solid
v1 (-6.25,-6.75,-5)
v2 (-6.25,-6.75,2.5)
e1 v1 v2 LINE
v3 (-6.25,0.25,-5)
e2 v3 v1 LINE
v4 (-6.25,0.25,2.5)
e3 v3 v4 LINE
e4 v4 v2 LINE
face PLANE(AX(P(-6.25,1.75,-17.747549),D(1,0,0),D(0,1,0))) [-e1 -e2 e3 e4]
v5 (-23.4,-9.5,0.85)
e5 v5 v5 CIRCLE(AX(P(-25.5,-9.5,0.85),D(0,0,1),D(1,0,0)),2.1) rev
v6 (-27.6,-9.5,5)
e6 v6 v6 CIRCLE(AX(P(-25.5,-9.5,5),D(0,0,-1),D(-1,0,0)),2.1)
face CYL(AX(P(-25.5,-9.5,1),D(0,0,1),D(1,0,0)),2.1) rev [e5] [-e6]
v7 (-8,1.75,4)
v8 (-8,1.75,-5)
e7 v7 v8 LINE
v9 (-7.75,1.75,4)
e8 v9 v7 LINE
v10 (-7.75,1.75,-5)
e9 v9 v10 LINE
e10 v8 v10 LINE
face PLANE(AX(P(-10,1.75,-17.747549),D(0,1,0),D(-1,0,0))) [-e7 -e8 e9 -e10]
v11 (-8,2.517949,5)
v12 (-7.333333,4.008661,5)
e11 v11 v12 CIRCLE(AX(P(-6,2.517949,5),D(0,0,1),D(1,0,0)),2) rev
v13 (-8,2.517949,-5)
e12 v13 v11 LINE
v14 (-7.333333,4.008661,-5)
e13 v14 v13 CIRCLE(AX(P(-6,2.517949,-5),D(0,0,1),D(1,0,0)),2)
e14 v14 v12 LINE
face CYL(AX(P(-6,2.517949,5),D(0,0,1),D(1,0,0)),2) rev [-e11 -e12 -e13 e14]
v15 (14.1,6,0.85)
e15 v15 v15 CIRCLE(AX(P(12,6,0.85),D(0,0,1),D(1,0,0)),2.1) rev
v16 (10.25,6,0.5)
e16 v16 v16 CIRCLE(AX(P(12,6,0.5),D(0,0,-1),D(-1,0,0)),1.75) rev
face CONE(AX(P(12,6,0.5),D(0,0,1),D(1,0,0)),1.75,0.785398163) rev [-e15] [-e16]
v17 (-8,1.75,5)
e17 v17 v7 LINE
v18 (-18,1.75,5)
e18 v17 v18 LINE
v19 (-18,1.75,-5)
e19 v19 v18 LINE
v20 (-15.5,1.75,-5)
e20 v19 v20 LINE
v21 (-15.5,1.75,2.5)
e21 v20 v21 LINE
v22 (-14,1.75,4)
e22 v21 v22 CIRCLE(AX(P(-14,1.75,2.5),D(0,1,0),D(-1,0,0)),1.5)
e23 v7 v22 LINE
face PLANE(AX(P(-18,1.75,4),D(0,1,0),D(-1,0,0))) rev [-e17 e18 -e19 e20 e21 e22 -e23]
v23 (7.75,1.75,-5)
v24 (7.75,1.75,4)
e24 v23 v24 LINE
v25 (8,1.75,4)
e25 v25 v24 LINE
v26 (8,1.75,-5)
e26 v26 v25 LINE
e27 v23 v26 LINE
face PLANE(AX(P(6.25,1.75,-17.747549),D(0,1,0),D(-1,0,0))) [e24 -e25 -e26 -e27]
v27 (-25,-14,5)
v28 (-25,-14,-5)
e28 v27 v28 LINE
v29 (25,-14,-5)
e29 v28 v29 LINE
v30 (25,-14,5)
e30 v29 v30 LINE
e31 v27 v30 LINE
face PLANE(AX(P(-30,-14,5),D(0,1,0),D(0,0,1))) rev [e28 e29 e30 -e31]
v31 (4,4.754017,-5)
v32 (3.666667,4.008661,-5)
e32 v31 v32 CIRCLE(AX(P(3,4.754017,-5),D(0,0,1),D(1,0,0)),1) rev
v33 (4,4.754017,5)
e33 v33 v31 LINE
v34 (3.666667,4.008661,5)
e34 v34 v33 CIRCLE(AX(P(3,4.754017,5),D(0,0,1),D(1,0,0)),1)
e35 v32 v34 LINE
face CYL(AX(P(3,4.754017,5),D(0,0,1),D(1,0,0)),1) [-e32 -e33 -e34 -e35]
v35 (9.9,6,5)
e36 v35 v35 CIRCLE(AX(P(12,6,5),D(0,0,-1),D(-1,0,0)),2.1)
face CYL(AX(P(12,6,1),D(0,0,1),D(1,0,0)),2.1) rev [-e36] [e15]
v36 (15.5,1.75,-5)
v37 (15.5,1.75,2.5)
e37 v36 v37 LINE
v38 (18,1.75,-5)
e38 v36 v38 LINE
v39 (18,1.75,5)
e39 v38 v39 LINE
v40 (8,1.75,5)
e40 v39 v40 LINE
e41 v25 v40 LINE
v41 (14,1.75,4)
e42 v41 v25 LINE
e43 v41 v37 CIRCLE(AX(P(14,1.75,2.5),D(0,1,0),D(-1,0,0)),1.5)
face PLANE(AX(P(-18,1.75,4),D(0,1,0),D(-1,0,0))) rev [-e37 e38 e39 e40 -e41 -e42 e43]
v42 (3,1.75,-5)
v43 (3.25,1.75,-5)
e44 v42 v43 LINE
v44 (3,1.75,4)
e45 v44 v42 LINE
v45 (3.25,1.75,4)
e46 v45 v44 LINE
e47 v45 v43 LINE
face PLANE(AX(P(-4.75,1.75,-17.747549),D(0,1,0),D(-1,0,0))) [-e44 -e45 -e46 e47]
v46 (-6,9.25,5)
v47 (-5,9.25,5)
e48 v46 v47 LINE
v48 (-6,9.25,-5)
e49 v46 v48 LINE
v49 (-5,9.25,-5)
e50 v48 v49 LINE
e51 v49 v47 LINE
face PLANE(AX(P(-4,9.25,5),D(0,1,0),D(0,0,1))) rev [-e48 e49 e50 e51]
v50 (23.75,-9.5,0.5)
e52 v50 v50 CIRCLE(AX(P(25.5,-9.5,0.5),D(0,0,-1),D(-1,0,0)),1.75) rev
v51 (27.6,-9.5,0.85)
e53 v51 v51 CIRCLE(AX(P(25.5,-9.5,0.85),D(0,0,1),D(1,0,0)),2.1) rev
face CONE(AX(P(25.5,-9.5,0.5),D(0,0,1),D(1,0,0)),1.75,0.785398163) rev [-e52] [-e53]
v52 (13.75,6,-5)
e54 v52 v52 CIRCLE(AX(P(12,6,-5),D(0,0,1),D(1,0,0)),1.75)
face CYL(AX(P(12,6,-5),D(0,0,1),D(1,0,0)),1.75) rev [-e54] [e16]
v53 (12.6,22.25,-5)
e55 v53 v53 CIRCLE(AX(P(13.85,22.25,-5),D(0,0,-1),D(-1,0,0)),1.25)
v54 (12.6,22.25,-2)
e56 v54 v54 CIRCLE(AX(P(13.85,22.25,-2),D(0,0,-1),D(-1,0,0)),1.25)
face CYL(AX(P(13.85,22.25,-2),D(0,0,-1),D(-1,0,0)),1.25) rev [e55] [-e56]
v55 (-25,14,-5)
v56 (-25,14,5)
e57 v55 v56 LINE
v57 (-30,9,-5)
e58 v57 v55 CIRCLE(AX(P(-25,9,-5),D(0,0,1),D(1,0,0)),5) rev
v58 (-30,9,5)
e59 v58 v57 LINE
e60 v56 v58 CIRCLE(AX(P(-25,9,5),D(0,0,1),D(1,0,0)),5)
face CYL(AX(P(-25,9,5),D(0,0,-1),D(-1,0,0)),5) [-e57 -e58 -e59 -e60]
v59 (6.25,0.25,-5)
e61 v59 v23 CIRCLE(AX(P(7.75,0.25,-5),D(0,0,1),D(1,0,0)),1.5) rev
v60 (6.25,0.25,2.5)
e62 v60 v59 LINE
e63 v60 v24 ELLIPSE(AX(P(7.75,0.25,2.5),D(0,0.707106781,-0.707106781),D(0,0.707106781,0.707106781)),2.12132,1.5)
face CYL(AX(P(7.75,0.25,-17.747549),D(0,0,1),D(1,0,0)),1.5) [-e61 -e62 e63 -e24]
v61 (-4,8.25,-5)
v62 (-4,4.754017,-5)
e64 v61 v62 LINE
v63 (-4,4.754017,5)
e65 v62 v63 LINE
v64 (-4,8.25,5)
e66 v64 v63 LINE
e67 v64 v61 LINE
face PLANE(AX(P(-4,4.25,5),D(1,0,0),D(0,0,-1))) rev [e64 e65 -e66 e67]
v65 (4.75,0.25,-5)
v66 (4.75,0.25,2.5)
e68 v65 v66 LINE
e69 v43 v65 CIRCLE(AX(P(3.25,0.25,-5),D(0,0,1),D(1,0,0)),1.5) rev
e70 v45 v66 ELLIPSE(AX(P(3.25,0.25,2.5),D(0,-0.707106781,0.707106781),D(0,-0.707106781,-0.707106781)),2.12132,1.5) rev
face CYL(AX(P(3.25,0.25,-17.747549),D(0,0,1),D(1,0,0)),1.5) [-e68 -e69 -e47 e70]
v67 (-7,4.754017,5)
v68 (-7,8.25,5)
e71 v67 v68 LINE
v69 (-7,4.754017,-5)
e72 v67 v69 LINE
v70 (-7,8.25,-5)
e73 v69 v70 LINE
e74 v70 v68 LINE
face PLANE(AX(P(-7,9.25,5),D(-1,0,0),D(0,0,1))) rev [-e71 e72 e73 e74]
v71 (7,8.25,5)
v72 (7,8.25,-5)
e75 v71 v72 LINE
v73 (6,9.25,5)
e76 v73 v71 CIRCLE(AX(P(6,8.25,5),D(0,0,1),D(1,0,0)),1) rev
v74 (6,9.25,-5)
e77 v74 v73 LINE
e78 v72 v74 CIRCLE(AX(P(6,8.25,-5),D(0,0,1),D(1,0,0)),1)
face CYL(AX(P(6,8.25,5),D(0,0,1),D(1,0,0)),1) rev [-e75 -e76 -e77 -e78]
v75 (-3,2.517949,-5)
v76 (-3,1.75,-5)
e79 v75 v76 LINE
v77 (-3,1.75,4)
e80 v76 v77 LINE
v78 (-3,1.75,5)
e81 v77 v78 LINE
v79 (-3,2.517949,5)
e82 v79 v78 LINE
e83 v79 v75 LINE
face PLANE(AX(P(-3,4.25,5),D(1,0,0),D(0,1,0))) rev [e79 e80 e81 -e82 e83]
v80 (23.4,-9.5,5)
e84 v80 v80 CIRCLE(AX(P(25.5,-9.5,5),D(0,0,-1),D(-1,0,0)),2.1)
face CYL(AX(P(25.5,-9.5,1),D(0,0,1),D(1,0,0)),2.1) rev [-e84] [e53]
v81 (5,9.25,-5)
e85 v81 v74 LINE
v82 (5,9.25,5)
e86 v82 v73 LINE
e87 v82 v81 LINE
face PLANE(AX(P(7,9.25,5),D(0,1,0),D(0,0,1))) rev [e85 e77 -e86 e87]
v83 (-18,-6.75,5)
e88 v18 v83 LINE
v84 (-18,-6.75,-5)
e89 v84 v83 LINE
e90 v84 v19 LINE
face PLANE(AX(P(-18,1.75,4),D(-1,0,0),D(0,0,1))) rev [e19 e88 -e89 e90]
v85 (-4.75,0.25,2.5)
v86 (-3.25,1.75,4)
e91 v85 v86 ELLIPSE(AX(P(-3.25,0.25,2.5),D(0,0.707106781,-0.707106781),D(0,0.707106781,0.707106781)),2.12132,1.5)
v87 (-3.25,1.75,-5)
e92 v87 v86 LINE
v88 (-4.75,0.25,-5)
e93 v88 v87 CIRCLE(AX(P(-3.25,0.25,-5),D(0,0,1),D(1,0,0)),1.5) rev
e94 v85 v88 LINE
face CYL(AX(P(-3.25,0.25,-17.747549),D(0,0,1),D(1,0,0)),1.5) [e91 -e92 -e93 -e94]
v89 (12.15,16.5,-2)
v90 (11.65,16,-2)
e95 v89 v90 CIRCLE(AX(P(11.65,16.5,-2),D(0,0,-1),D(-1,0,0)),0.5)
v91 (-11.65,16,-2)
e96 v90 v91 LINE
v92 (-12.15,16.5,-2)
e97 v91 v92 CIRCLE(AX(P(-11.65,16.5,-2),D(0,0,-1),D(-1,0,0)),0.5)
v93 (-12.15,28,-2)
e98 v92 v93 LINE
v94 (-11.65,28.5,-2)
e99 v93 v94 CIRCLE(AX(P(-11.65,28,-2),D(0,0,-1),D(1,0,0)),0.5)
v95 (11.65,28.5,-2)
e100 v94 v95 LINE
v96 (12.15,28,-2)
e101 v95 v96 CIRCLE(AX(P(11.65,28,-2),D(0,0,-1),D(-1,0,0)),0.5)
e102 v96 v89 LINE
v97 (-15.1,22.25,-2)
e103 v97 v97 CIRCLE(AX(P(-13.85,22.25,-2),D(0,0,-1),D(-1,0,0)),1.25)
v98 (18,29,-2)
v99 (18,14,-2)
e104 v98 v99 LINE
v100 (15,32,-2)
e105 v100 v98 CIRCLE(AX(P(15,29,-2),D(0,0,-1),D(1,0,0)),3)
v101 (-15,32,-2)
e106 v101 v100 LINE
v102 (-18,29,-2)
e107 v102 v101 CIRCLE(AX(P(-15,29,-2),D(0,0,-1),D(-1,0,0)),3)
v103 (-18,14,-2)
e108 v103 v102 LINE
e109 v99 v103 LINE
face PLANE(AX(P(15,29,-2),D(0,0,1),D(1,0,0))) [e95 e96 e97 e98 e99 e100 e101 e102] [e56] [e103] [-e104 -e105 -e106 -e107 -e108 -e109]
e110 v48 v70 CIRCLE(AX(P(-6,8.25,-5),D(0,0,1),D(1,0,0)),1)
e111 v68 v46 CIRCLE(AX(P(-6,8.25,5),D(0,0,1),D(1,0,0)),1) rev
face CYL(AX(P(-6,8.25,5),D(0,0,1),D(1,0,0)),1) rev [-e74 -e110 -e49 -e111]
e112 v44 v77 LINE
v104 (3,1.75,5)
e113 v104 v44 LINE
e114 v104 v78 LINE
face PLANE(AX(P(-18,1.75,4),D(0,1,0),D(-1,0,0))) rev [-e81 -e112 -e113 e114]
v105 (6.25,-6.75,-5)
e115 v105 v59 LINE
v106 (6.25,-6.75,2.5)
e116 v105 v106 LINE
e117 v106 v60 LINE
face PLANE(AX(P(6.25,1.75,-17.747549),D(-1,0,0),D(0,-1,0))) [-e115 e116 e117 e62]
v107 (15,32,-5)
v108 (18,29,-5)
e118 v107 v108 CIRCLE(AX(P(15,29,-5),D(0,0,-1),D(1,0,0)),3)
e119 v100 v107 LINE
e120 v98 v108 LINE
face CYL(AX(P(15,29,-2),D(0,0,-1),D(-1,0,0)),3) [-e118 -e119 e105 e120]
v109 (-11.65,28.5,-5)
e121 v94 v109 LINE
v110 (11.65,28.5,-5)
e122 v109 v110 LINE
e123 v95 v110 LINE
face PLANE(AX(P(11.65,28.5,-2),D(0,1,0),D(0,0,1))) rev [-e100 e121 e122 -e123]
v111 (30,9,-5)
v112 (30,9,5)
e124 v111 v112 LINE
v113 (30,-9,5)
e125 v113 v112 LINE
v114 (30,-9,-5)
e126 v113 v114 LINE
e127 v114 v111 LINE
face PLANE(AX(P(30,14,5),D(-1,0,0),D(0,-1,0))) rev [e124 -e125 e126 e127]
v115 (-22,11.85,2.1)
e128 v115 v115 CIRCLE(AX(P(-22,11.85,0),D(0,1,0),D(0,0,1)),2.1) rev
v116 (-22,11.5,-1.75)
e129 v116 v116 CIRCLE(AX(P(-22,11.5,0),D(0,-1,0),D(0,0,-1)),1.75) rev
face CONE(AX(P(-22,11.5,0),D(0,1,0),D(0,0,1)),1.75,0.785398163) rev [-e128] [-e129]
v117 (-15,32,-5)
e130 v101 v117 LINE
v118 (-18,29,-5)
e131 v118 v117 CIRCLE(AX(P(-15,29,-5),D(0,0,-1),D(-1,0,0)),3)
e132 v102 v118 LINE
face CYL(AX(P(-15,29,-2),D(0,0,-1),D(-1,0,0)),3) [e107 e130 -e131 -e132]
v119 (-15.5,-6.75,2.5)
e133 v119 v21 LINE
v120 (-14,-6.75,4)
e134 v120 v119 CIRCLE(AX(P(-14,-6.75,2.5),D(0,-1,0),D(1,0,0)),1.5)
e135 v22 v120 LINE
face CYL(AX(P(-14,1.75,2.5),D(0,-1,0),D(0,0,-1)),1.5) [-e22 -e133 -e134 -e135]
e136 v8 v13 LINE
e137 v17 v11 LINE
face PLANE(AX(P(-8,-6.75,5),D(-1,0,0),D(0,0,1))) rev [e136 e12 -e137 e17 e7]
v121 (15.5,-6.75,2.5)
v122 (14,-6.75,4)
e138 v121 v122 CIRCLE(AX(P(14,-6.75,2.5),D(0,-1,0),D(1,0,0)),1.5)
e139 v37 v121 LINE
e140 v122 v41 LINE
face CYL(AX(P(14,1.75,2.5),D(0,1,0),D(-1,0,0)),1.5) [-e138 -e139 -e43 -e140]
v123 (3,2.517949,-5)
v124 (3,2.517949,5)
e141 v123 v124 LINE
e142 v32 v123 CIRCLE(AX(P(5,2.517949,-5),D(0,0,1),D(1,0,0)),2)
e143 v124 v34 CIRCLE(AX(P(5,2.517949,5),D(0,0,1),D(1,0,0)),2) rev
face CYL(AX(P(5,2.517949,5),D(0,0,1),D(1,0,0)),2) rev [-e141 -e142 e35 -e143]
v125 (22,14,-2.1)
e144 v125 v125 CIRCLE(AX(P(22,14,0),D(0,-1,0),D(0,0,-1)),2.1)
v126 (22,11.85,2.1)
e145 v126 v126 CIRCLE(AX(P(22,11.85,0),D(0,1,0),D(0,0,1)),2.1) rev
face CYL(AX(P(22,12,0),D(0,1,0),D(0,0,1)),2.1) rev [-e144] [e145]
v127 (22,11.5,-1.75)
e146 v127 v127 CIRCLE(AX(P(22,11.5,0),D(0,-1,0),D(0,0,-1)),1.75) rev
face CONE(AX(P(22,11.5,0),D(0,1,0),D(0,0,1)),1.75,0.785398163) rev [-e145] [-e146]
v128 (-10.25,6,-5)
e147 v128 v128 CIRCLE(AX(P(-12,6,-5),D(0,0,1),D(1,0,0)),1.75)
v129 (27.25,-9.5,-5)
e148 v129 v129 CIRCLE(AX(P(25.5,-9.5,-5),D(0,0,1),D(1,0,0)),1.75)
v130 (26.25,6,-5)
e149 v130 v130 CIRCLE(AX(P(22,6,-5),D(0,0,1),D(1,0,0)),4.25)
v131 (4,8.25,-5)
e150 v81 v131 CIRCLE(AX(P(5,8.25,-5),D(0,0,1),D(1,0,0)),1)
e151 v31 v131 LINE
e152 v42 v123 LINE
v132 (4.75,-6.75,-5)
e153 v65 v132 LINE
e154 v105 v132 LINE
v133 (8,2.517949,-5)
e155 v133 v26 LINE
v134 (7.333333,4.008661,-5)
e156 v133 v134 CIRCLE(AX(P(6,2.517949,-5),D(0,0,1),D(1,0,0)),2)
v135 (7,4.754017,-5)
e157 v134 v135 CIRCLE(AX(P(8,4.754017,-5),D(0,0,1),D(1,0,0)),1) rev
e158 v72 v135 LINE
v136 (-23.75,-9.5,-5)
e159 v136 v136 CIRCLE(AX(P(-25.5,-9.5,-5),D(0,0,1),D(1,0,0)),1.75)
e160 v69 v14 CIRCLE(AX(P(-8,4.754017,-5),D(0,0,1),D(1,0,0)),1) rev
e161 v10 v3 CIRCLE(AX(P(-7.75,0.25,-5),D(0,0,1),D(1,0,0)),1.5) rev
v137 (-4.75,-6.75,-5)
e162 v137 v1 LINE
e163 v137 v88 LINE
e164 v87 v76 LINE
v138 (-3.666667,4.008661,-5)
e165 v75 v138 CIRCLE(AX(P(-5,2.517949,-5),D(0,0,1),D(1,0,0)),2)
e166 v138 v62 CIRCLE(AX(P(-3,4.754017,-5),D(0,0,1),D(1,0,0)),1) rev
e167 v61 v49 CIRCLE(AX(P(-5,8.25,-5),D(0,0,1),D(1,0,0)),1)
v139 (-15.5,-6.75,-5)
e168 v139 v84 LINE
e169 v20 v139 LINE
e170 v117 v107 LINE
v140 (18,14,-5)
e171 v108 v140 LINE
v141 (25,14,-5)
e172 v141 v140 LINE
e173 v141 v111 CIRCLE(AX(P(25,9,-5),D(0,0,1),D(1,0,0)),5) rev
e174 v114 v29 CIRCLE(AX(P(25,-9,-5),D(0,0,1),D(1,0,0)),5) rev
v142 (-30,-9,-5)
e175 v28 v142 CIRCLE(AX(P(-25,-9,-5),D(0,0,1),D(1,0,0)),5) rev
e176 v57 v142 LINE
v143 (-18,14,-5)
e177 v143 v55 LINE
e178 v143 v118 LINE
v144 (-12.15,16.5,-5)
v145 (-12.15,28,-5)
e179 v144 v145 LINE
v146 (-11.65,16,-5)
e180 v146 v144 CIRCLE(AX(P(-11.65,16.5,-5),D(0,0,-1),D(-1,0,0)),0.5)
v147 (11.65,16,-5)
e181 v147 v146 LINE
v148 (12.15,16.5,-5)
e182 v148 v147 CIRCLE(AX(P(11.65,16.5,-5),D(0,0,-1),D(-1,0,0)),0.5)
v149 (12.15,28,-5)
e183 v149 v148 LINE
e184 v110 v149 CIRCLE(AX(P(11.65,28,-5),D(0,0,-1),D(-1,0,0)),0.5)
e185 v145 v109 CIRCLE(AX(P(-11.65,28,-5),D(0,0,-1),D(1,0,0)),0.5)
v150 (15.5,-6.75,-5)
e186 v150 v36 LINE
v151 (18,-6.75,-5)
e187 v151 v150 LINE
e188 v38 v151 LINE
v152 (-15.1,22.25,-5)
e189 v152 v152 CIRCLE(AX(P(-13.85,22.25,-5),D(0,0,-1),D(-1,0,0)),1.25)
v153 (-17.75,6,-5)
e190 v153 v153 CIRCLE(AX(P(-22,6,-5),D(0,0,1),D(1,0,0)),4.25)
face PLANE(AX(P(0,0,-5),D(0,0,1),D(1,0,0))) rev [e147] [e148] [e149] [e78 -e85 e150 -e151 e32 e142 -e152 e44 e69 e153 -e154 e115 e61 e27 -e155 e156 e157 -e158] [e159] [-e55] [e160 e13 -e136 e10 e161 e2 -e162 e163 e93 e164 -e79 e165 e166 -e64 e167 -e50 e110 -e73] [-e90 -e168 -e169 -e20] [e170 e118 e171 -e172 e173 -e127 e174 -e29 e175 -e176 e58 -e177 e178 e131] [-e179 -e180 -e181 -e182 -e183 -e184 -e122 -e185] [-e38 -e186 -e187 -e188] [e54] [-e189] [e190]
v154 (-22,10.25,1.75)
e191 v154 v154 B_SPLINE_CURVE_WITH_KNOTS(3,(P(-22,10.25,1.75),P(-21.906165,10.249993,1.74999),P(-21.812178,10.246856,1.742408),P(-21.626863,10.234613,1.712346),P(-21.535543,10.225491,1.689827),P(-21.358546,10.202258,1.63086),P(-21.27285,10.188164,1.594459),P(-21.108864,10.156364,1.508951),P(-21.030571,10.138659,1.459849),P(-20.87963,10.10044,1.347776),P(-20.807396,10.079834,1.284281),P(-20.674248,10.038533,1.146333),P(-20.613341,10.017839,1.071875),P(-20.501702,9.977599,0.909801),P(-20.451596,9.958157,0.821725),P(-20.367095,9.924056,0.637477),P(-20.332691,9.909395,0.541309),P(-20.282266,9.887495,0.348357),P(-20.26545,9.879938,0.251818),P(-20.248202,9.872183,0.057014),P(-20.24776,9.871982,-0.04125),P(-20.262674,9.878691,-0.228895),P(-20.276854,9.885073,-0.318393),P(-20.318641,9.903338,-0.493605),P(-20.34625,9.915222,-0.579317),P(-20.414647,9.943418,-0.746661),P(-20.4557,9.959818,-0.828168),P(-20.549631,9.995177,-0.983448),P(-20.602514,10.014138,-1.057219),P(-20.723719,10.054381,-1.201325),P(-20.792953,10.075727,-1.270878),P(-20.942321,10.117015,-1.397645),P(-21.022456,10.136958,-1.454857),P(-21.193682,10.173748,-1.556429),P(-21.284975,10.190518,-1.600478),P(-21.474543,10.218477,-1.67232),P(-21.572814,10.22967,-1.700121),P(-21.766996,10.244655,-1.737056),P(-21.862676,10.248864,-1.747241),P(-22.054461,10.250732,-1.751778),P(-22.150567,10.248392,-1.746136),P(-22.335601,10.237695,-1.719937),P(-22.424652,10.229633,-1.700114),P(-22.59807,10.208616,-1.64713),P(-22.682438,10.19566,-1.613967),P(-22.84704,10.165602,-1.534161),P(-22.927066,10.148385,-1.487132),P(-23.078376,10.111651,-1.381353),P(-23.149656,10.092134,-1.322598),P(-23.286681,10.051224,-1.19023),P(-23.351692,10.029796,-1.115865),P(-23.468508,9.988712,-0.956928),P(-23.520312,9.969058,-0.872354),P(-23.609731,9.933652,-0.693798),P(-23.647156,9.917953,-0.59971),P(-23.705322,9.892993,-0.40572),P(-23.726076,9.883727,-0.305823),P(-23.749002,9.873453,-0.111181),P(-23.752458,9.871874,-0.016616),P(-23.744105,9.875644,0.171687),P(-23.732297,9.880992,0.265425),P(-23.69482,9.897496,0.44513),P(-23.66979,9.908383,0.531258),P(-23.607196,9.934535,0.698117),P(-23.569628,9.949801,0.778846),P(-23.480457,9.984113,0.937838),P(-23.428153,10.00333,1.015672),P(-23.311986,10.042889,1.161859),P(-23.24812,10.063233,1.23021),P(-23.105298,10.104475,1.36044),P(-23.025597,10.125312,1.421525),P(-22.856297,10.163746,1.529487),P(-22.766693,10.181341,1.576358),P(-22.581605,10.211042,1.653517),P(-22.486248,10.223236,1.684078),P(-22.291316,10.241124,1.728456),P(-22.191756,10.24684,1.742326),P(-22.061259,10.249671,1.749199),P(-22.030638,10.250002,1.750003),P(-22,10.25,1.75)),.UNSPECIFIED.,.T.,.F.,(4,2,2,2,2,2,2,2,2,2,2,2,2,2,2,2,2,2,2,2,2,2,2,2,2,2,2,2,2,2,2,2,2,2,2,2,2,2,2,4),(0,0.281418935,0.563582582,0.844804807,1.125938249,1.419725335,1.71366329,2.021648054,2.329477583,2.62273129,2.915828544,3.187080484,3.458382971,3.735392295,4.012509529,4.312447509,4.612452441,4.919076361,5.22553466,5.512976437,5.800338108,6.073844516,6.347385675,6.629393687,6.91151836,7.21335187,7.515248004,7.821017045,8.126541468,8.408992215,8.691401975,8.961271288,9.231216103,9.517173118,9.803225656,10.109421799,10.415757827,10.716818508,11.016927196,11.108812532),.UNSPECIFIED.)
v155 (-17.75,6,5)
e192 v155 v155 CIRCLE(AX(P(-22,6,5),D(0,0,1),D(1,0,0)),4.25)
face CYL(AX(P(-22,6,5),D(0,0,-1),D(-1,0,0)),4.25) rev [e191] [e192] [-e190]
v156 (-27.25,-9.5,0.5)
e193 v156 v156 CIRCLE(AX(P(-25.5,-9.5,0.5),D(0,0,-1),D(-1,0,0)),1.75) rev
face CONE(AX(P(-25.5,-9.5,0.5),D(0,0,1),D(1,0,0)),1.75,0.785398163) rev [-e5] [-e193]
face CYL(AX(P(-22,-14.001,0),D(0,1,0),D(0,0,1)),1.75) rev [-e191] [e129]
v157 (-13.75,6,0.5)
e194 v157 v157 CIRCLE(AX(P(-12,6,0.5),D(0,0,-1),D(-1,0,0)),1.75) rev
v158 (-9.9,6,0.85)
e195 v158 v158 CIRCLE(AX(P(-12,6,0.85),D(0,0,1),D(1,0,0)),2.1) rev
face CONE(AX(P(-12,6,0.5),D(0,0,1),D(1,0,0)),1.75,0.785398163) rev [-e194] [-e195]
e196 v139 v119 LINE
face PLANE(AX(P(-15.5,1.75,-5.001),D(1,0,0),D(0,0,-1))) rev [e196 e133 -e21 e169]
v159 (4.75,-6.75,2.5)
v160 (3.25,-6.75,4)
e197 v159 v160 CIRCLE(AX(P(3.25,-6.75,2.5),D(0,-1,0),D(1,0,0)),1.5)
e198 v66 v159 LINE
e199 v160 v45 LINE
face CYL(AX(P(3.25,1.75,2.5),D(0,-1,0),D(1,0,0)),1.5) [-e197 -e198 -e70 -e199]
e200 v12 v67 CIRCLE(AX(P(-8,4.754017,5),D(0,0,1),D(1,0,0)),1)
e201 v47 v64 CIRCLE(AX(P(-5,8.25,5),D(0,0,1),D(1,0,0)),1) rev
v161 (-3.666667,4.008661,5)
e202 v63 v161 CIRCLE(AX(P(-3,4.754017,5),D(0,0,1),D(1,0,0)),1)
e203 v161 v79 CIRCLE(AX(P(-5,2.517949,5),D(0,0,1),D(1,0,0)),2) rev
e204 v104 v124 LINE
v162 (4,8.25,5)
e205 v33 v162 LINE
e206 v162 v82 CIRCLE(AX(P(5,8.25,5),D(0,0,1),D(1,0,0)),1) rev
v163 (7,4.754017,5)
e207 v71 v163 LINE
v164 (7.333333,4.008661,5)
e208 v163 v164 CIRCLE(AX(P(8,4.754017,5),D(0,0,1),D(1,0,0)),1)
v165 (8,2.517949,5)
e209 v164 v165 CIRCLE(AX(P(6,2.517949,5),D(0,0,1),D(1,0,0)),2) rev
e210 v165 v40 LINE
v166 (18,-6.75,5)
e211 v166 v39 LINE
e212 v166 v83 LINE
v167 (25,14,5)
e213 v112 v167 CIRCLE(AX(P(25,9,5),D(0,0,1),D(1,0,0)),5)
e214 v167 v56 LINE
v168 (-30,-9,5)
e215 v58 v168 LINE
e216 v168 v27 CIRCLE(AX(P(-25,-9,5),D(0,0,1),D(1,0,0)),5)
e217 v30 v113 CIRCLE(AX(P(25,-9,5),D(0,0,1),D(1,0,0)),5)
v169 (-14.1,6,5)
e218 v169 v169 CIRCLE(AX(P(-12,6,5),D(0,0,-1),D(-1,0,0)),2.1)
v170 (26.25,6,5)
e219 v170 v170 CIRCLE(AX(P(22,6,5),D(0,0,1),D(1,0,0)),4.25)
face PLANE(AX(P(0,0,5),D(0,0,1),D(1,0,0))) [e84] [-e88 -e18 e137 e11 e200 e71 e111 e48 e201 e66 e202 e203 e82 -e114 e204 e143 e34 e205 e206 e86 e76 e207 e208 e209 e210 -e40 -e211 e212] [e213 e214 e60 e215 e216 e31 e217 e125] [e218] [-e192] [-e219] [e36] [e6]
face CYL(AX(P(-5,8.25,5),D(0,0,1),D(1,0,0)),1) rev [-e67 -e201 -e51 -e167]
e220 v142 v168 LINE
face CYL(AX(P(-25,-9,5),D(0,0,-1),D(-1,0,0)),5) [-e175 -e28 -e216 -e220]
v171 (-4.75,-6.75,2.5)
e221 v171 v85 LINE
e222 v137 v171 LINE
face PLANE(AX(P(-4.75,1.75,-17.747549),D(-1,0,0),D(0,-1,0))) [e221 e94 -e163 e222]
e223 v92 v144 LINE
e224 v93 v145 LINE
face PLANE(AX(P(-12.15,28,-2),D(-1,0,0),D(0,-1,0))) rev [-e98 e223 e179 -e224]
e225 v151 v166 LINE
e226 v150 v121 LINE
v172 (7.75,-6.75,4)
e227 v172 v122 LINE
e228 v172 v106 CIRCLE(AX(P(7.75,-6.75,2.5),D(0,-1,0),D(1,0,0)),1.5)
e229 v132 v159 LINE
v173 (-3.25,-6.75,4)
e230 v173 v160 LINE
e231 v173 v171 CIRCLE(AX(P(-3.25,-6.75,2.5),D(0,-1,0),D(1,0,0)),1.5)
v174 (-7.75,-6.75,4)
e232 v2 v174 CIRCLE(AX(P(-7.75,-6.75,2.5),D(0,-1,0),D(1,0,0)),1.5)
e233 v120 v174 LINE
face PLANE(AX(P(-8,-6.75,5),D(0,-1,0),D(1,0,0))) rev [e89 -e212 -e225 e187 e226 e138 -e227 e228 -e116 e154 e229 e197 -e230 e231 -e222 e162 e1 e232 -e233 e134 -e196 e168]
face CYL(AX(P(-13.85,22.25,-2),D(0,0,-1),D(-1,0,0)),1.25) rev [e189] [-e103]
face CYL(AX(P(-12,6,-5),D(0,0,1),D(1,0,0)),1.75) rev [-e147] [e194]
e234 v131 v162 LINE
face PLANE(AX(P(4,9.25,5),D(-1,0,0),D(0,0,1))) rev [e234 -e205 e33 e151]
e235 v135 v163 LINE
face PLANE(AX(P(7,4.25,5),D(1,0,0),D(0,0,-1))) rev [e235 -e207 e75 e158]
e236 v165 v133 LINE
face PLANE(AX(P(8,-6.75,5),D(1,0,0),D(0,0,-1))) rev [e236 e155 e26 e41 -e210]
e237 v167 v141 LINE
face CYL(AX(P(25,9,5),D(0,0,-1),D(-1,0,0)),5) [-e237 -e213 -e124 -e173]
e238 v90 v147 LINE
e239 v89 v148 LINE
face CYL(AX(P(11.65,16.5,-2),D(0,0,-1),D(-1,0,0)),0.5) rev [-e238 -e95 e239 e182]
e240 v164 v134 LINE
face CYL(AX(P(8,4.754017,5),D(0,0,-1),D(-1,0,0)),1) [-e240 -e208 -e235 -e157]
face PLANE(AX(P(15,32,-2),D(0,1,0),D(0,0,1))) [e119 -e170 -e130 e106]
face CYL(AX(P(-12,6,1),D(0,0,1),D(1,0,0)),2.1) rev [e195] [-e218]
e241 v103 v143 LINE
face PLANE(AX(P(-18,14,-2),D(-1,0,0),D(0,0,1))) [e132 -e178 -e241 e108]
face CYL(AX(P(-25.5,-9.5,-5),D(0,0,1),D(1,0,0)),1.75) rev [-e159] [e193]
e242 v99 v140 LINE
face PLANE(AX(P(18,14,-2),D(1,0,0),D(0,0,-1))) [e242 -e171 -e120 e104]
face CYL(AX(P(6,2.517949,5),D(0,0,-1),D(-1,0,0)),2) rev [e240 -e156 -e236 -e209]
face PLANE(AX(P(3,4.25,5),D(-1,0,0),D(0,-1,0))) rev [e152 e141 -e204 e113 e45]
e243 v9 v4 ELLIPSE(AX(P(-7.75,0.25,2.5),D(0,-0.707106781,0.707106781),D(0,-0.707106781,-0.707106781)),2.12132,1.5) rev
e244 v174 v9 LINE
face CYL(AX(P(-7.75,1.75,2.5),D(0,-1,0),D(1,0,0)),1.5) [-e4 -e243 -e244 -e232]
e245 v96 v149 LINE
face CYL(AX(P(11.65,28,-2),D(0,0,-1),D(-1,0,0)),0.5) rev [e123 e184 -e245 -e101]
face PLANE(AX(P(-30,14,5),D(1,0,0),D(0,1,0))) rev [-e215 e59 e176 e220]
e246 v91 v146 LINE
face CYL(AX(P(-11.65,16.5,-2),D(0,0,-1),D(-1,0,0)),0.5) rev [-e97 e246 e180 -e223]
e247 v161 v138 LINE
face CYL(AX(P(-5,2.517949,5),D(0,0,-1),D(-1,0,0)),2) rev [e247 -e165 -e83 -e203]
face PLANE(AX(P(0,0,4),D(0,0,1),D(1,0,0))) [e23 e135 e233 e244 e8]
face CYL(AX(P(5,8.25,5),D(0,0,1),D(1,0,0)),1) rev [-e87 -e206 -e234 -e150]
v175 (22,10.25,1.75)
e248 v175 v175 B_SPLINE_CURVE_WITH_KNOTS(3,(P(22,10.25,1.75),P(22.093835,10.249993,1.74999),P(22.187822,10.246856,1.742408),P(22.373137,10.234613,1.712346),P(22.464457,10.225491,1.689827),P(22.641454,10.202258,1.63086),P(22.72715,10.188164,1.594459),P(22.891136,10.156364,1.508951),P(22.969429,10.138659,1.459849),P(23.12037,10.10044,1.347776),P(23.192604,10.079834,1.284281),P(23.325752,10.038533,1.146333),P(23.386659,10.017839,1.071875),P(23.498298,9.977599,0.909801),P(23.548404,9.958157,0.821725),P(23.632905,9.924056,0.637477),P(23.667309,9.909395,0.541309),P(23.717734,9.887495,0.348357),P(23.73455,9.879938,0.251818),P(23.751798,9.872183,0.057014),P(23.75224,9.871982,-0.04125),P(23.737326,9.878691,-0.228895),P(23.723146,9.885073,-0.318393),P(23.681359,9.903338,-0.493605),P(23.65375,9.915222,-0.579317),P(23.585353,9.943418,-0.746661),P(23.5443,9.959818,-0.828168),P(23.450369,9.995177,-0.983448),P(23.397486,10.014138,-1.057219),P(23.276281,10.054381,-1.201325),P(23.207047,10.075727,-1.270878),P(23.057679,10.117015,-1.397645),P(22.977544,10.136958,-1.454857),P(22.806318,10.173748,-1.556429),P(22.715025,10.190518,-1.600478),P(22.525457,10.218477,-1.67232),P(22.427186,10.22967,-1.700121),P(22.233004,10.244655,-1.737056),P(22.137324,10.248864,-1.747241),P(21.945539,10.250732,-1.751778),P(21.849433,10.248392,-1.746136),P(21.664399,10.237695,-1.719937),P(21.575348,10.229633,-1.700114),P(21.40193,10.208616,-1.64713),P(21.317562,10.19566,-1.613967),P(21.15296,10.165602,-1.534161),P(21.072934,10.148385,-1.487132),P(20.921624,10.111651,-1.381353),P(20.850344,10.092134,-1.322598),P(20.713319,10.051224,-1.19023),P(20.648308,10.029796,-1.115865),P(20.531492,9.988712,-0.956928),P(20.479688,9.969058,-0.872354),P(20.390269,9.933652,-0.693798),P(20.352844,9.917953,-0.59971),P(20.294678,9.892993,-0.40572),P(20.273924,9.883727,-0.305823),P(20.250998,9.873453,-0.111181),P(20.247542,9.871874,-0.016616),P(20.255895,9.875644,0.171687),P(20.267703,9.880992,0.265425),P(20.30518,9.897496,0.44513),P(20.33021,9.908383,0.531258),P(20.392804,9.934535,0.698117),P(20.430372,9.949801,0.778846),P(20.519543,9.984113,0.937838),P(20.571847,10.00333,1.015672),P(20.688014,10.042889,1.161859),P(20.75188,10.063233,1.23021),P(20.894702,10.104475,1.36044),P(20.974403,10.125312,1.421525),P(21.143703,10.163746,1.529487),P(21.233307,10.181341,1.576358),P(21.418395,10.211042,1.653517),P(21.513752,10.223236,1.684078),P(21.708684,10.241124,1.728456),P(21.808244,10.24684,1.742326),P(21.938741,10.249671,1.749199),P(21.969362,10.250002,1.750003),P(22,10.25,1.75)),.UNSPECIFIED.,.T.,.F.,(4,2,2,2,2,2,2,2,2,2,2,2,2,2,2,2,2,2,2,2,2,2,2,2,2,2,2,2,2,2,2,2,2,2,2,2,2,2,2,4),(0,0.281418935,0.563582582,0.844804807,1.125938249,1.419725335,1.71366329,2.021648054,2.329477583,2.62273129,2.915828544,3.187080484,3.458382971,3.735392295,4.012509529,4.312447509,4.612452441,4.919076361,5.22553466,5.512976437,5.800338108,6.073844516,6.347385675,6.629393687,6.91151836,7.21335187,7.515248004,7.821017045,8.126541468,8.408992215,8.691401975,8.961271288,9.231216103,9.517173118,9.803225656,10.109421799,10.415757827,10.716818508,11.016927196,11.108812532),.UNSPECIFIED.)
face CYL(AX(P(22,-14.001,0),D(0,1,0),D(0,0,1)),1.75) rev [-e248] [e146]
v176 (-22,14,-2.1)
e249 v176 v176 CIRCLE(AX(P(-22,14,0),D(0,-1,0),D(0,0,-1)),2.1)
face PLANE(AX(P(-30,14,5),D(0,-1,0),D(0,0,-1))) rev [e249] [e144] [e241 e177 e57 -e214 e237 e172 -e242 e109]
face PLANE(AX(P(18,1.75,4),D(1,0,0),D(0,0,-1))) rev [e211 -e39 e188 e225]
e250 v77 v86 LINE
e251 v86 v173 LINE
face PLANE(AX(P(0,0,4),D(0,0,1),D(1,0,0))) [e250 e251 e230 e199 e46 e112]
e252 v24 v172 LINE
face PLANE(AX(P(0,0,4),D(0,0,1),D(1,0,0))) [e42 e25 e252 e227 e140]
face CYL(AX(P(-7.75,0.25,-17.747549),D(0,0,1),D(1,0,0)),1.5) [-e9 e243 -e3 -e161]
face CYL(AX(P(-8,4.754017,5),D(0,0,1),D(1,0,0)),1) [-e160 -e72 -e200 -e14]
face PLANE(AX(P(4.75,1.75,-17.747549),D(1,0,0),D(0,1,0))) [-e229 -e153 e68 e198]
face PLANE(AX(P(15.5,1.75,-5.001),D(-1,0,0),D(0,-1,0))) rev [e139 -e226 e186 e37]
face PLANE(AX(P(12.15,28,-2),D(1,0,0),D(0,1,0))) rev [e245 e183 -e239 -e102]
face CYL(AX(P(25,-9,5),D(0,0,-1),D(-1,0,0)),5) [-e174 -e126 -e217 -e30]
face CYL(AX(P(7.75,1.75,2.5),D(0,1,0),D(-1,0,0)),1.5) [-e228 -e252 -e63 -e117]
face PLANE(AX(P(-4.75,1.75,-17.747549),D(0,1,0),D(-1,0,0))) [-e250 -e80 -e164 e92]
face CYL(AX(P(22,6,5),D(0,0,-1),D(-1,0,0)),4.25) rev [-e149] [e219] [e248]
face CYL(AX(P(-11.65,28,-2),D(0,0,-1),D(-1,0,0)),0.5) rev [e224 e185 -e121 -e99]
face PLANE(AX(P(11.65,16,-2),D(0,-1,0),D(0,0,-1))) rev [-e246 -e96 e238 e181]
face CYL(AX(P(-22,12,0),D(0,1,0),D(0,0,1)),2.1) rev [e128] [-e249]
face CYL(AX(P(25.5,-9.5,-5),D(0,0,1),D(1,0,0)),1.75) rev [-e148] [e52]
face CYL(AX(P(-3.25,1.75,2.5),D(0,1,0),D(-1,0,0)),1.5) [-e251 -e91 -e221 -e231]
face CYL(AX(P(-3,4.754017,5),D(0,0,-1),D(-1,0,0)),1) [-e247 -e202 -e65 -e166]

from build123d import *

# Parameters (mm, degrees)
SKETCH1_W           = 60
SKETCH1_H           = 28
SKETCH1_R           = 4.25
BOSS_EXTRUDE1_DEPTH = 5
CUT_EXTRUDE1_DEPTH  = 35.583232932
CUT_EXTRUDE2_REACH  = 43.34
SKETCH3_R           = 1.75
FILLET1_R           = 5
FILLET2_R           = 2
SKETCH4_R           = 1.25
BOSS_EXTRUDE2_DEPTH = 3
SKETCH5_W           = 3.75
SKETCH5_H           = 8.5
SKETCH5_W_2         = 9.5
BOSS_EXTRUDE4_DEPTH = 10
SKETCH6_W           = 36
SKETCH6_H           = 8.5
CUT_EXTRUDE3_DEPTH  = 1
SKETCH7_R           = 1.75
CUT_EXTRUDE4_DEPTH  = 45.988887539
SKETCH8_R           = 2.1
CUT_EXTRUDE5_DEPTH  = 4
SKETCH9_R           = 2.1
CUT_EXTRUDE6_DEPTH  = 2
CHAMFER1_SIZE       = 0.5
CUT_EXTRUDE7_REACH  = 46.777
SKETCH10_W          = 2.5
SKETCH10_H          = 8.5
FILLET3_R           = 1.5
FILLET4_R           = 1


with BuildPart() as part:
    # Sketch1 → Boss-Extrude1 (new, symmetric)
    with BuildSketch(Plane.XY):
        Rectangle(SKETCH1_W, SKETCH1_H)
        with Locations((-22, 6)):
            Circle(SKETCH1_R, mode=Mode.SUBTRACT)
        with Locations((22, 6)):
            Circle(SKETCH1_R, mode=Mode.SUBTRACT)
    extrude(amount=BOSS_EXTRUDE1_DEPTH, both=True)

    # Sketch2 → Cut-Extrude1 (cut, through all)
    with BuildSketch(Plane(origin=(0, 0, -5), x_dir=(-1, 0, 0), z_dir=(0, 0, -1))):
        Polygon((8, -6.75), (3, -6.75), (3, 4.25), (4, 4.25), (4, 9.25), (7, 9.25), (7, 4.25), (8, 4.25), align=None)
        Polygon((-8, -6.75), (-8, 4.25), (-7, 4.25), (-7, 9.25), (-4, 9.25), (-4, 4.25), (-3, 4.25), (-3, -6.75), align=None)
    extrude(amount=-CUT_EXTRUDE1_DEPTH, mode=Mode.SUBTRACT)

    # Sketch3 → Cut-Extrude2 (cut, up to next)
    with BuildSketch(Plane(origin=(0, 14, 0), x_dir=(1, 0, 0), z_dir=(0, 1, 0)), mode=Mode.PRIVATE) as cut_extrude2_sk1:
        with Locations(Location((-22, 0, 0), (0, 0, 270))):
            Circle(SKETCH3_R)
    cut_extrude2_tool1 = extrude(cut_extrude2_sk1.sketch, amount=-CUT_EXTRUDE2_REACH, mode=Mode.PRIVATE) & part.part
    # Sketch3 → Cut-Extrude2 (cut, up to next)
    with BuildSketch(Plane(origin=(0, 14, 0), x_dir=(1, 0, 0), z_dir=(0, 1, 0)), mode=Mode.PRIVATE) as cut_extrude2_sk2:
        with Locations(Location((22, 0, 0), (0, 0, 270))):
            Circle(SKETCH3_R)
    cut_extrude2_tool2 = extrude(cut_extrude2_sk2.sketch, amount=-CUT_EXTRUDE2_REACH, mode=Mode.PRIVATE) & part.part
    add(cut_extrude2_tool1.solids().sort_by_distance((-22, 14, 0))[0], mode=Mode.SUBTRACT)
    add(cut_extrude2_tool2.solids().sort_by_distance((22, 14, 0))[0], mode=Mode.SUBTRACT)

    # Fillet1
    fillet1_edges = [part.edges().sort_by_distance(p)[0] for p in [
        (-30, 14, 0),
        (30, 14, 0),
        (30, -14, 0),
        (-30, -14, 0),
    ]]
    fillet(fillet1_edges, radius=FILLET1_R)

    # Fillet2
    # the kernel refuses this fillet: 2 mm, written as the material it adds along each edge
    with BuildSketch(Plane(origin=(-8, 4.25, -5), x_dir=(0, -1, 0), z_dir=(0, 0, 1)), Plane(origin=(3, 4.25, -5), x_dir=(0, -1, 0), z_dir=(0, 0, 1))) as fillet2_piece_1:
        with BuildLine():
            CenterArc((1.732050808, 2), FILLET2_R, 210, 60)
            Line((0, 1), (-0.034641016, 0.98))
            ThreePointArc((-0.034641016, 0.98), (-0.04, 0.5), (-0.04, 0))
            Line((-0.04, 0), (0, -0.04))
            Line((0, -0.04), (1.732050808, -0.04))
            Line((1.732050808, -0.04), (1.732050808, 0))
        make_face()
    extrude(amount=10)
    with BuildSketch(Plane(origin=(-3, 4.25, -5), x_dir=(-1, 0, 0), z_dir=(0, 0, 1)), Plane(origin=(8, 4.25, -5), x_dir=(-1, 0, 0), z_dir=(0, 0, 1))) as fillet2_piece_2:
        with BuildLine():
            CenterArc((2, 1.732050808), FILLET2_R, 180, 60)
            Line((0, 1.732050808), (-0.04, 1.732050808))
            Line((-0.04, 1.732050808), (-0.04, 0))
            Line((-0.04, 0), (0, -0.04))
            ThreePointArc((0, -0.04), (0.5, -0.04), (0.98, -0.034641016))
            Line((0.98, -0.034641016), (1, 0))
        make_face()
    extrude(amount=10)

    # Sketch4 → Boss-Extrude2 (add)
    with BuildSketch(Plane(origin=(0, 0, -5), x_dir=(-1, 0, 0), z_dir=(0, 0, -1))):
        with BuildLine():
            Line((-18, 14), (18, 14))
            Line((18, 14), (18, 29))
            ThreePointArc((18, 29), (17.121320344, 31.121320344), (15, 32))
            Line((15, 32), (-15, 32))
            ThreePointArc((-15, 32), (-17.121320344, 31.121320344), (-18, 29))
            Line((-18, 29), (-18, 14))
        make_face()
        with Locations((-13.85, 22.25)):
            Circle(SKETCH4_R, mode=Mode.SUBTRACT)
        with Locations((13.85, 22.25)):
            Circle(SKETCH4_R, mode=Mode.SUBTRACT)
        with BuildLine():
            Line((-11.65, 28.5), (11.65, 28.5))
            ThreePointArc((11.65, 28.5), (12.003553391, 28.353553391), (12.15, 28))
            Line((12.15, 28), (12.15, 16.5))
            ThreePointArc((12.15, 16.5), (12.003553391, 16.146446609), (11.65, 16))
            Line((11.65, 16), (-11.65, 16))
            ThreePointArc((-11.65, 16), (-12.003553391, 16.146446609), (-12.15, 16.5))
            Line((-12.15, 16.5), (-12.15, 28))
            ThreePointArc((-12.15, 28), (-12.003553391, 28.353553391), (-11.65, 28.5))
        make_face(mode=Mode.SUBTRACT)
    extrude(amount=-BOSS_EXTRUDE2_DEPTH)

    # Sketch5 → Boss-Extrude4 (add)
    with BuildSketch(Plane.XY.offset(5)):
        with Locations((-8.125, -2.5)):
            Rectangle(SKETCH5_W, SKETCH5_H)
        with Locations((0, -2.5)):
            Rectangle(SKETCH5_W_2, SKETCH5_H)
        with Locations((8.125, -2.5)):
            Rectangle(SKETCH5_W, SKETCH5_H)
    extrude(amount=-BOSS_EXTRUDE4_DEPTH)

    # Sketch6 → Cut-Extrude3 (cut)
    with BuildSketch(Plane.XY.offset(5)):
        with Locations((0, -2.5)):
            Rectangle(SKETCH6_W, SKETCH6_H)
    extrude(amount=-CUT_EXTRUDE3_DEPTH, mode=Mode.SUBTRACT)

    # Sketch7 → Cut-Extrude4 (cut, through all)
    with BuildSketch(Plane.XY.offset(5)):
        with Locations((25.5, -9.5)):
            Circle(SKETCH7_R)
        with Locations((-25.5, -9.5)):
            Circle(SKETCH7_R)
        with Locations((-12, 6)):
            Circle(SKETCH7_R)
        with Locations((12, 6)):
            Circle(SKETCH7_R)
    extrude(amount=-CUT_EXTRUDE4_DEPTH, mode=Mode.SUBTRACT)

    # Sketch8 → Cut-Extrude5 (cut)
    with BuildSketch(Plane(origin=(0, 0, 5), x_dir=(-1, 0, 0), z_dir=(0, 0, -1))):
        with Locations((-12, 6)):
            Circle(SKETCH8_R)
        with Locations((-25.5, -9.5)):
            Circle(SKETCH8_R)
        with Locations((25.5, -9.5)):
            Circle(SKETCH8_R)
        with Locations((12, 6)):
            Circle(SKETCH8_R)
    extrude(amount=CUT_EXTRUDE5_DEPTH, mode=Mode.SUBTRACT)

    # Sketch9 → Cut-Extrude6 (cut)
    with BuildSketch(Plane.XZ.offset(-14)):
        with Locations(Location((-22, 0, 0), (0, 0, 270))):
            Circle(SKETCH9_R)
        with Locations(Location((22, 0, 0), (0, 0, 270))):
            Circle(SKETCH9_R)
    extrude(amount=CUT_EXTRUDE6_DEPTH, mode=Mode.SUBTRACT)

    # Chamfer1
    # the kernel refuses this chamfer: 0.5 mm, written as the material it takes off along each edge
    with BuildSketch(Plane(origin=(-25.5, -9.5, 1), x_dir=(1, 0, 0), z_dir=(0, -1, 0))) as chamfer1_piece_1_section:
        Polygon((1.75, -CHAMFER1_SIZE), (1.75 + CHAMFER1_SIZE, 0), (1.75, 0), align=None)
    chamfer1_piece_1 = revolve(axis=Axis((-25.5, -9.5, 1), (0, 0, 1)), mode=Mode.PRIVATE)
    chamfer1_piece_1 = chamfer1_piece_1 & Plane(origin=(-25.5, -9.5, 0.675956313), x_dir=(-1, 0, 0), z_dir=(0, 0, 1)) * Cylinder(2.1, 9, mode=Mode.PRIVATE)
    add(chamfer1_piece_1, mode=Mode.SUBTRACT)
    with BuildSketch(Plane(origin=(25.5, -9.5, 1), x_dir=(1, 0, 0), z_dir=(0, -1, 0))) as chamfer1_piece_2_section:
        Polygon((1.75, -CHAMFER1_SIZE), (1.75 + CHAMFER1_SIZE, 0), (1.75, 0), align=None)
    chamfer1_piece_2 = revolve(axis=Axis((25.5, -9.5, 1), (0, 0, 1)), mode=Mode.PRIVATE)
    chamfer1_piece_2 = chamfer1_piece_2 & Plane(origin=(25.5, -9.5, 0.675956313), x_dir=(-1, 0, 0), z_dir=(0, 0, 1)) * Cylinder(2.1, 9, mode=Mode.PRIVATE)
    add(chamfer1_piece_2, mode=Mode.SUBTRACT)
    with BuildSketch(Plane(origin=(-22, 12, 0), x_dir=(0, 0, 1), z_dir=(-1, 0, 0))) as chamfer1_piece_3_section:
        Polygon((1.75, -CHAMFER1_SIZE), (1.75 + CHAMFER1_SIZE, 0), (1.75, 0), align=None)
    chamfer1_piece_3 = revolve(axis=Axis((-22, 12, 0), (0, 1, 0)), mode=Mode.PRIVATE)
    chamfer1_piece_3 = chamfer1_piece_3 & Plane(origin=(-22, 11.675956313, 0), x_dir=(0, 0, -1), z_dir=(0, 1, 0)) * Cylinder(2.1, 9, mode=Mode.PRIVATE)
    add(chamfer1_piece_3, mode=Mode.SUBTRACT)
    with BuildSketch(Plane(origin=(22, 12, 0), x_dir=(0, 0, 1), z_dir=(-1, 0, 0))) as chamfer1_piece_4_section:
        Polygon((1.75, -CHAMFER1_SIZE), (1.75 + CHAMFER1_SIZE, 0), (1.75, 0), align=None)
    chamfer1_piece_4 = revolve(axis=Axis((22, 12, 0), (0, 1, 0)), mode=Mode.PRIVATE)
    chamfer1_piece_4 = chamfer1_piece_4 & Plane(origin=(22, 11.675956313, 0), x_dir=(0, 0, -1), z_dir=(0, 1, 0)) * Cylinder(2.1, 9, mode=Mode.PRIVATE)
    add(chamfer1_piece_4, mode=Mode.SUBTRACT)
    with BuildSketch(Plane(origin=(-12, 6, 1), x_dir=(1, 0, 0), z_dir=(0, -1, 0))) as chamfer1_piece_5_section:
        Polygon((1.75, -CHAMFER1_SIZE), (1.75 + CHAMFER1_SIZE, 0), (1.75, 0), align=None)
    chamfer1_piece_5 = revolve(axis=Axis((-12, 6, 1), (0, 0, 1)), mode=Mode.PRIVATE)
    chamfer1_piece_5 = chamfer1_piece_5 & Plane(origin=(-12, 6, 0.675956313), x_dir=(-1, 0, 0), z_dir=(0, 0, 1)) * Cylinder(2.1, 9, mode=Mode.PRIVATE)
    add(chamfer1_piece_5, mode=Mode.SUBTRACT)
    with BuildSketch(Plane(origin=(12, 6, 1), x_dir=(1, 0, 0), z_dir=(0, -1, 0))) as chamfer1_piece_6_section:
        Polygon((1.75, -CHAMFER1_SIZE), (1.75 + CHAMFER1_SIZE, 0), (1.75, 0), align=None)
    chamfer1_piece_6 = revolve(axis=Axis((12, 6, 1), (0, 0, 1)), mode=Mode.PRIVATE)
    chamfer1_piece_6 = chamfer1_piece_6 & Plane(origin=(12, 6, 0.675956313), x_dir=(-1, 0, 0), z_dir=(0, 0, 1)) * Cylinder(2.1, 9, mode=Mode.PRIVATE)
    add(chamfer1_piece_6, mode=Mode.SUBTRACT)

    # Sketch10 → Cut-Extrude7 (cut, up to next)
    with BuildSketch(Plane.XY.offset(4), mode=Mode.PRIVATE) as cut_extrude7_sk1:
        with Locations((-16.75, -2.5)):
            Rectangle(SKETCH10_W, SKETCH10_H)
    cut_extrude7_tool1 = extrude(cut_extrude7_sk1.sketch, amount=-CUT_EXTRUDE7_REACH, mode=Mode.PRIVATE) & part.part
    # Sketch10 → Cut-Extrude7 (cut, up to next)
    with BuildSketch(Plane.XY.offset(4), mode=Mode.PRIVATE) as cut_extrude7_sk2:
        with Locations((16.75, -2.5)):
            Rectangle(SKETCH10_W, SKETCH10_H)
    cut_extrude7_tool2 = extrude(cut_extrude7_sk2.sketch, amount=-CUT_EXTRUDE7_REACH, mode=Mode.PRIVATE) & part.part
    add(cut_extrude7_tool1.solids().sort_by_distance((-16.75, -2.5, 4))[0], mode=Mode.SUBTRACT)
    add(cut_extrude7_tool2.solids().sort_by_distance((16.75, -2.5, 4))[0], mode=Mode.SUBTRACT)

    # Fillet3
    fillet3_edges = [part.edges().sort_by_distance(p)[0] for p in [
        (-6.25, 1.75, -0.5),
        (-4.75, 1.75, -0.5),
        (4.75, 1.75, -0.5),
        (6.25, 1.75, -0.5),
        (6.25, -2.5, 4),
        (-6.25, -2.5, 4),
        (-4.75, -2.5, 4),
        (4.75, -2.5, 4),
        (-15.5, -2.5, 4),
        (15.5, -2.5, 4),
    ]]
    fillet(fillet3_edges, radius=FILLET3_R)

    # Fillet4
    fillet4_edges = [part.edges().sort_by_distance(p)[0] for p in [
        (-4, 4.25, 0),
        (-4, 9.25, 0),
        (-7, 9.25, 0),
        (-7, 4.25, 0),
        (7, 4.25, 0),
        (7, 9.25, 0),
        (4, 9.25, 0),
        (4, 4.25, 0),
    ]]
    fillet(fillet4_edges, radius=FILLET4_R)


solid = part.part
